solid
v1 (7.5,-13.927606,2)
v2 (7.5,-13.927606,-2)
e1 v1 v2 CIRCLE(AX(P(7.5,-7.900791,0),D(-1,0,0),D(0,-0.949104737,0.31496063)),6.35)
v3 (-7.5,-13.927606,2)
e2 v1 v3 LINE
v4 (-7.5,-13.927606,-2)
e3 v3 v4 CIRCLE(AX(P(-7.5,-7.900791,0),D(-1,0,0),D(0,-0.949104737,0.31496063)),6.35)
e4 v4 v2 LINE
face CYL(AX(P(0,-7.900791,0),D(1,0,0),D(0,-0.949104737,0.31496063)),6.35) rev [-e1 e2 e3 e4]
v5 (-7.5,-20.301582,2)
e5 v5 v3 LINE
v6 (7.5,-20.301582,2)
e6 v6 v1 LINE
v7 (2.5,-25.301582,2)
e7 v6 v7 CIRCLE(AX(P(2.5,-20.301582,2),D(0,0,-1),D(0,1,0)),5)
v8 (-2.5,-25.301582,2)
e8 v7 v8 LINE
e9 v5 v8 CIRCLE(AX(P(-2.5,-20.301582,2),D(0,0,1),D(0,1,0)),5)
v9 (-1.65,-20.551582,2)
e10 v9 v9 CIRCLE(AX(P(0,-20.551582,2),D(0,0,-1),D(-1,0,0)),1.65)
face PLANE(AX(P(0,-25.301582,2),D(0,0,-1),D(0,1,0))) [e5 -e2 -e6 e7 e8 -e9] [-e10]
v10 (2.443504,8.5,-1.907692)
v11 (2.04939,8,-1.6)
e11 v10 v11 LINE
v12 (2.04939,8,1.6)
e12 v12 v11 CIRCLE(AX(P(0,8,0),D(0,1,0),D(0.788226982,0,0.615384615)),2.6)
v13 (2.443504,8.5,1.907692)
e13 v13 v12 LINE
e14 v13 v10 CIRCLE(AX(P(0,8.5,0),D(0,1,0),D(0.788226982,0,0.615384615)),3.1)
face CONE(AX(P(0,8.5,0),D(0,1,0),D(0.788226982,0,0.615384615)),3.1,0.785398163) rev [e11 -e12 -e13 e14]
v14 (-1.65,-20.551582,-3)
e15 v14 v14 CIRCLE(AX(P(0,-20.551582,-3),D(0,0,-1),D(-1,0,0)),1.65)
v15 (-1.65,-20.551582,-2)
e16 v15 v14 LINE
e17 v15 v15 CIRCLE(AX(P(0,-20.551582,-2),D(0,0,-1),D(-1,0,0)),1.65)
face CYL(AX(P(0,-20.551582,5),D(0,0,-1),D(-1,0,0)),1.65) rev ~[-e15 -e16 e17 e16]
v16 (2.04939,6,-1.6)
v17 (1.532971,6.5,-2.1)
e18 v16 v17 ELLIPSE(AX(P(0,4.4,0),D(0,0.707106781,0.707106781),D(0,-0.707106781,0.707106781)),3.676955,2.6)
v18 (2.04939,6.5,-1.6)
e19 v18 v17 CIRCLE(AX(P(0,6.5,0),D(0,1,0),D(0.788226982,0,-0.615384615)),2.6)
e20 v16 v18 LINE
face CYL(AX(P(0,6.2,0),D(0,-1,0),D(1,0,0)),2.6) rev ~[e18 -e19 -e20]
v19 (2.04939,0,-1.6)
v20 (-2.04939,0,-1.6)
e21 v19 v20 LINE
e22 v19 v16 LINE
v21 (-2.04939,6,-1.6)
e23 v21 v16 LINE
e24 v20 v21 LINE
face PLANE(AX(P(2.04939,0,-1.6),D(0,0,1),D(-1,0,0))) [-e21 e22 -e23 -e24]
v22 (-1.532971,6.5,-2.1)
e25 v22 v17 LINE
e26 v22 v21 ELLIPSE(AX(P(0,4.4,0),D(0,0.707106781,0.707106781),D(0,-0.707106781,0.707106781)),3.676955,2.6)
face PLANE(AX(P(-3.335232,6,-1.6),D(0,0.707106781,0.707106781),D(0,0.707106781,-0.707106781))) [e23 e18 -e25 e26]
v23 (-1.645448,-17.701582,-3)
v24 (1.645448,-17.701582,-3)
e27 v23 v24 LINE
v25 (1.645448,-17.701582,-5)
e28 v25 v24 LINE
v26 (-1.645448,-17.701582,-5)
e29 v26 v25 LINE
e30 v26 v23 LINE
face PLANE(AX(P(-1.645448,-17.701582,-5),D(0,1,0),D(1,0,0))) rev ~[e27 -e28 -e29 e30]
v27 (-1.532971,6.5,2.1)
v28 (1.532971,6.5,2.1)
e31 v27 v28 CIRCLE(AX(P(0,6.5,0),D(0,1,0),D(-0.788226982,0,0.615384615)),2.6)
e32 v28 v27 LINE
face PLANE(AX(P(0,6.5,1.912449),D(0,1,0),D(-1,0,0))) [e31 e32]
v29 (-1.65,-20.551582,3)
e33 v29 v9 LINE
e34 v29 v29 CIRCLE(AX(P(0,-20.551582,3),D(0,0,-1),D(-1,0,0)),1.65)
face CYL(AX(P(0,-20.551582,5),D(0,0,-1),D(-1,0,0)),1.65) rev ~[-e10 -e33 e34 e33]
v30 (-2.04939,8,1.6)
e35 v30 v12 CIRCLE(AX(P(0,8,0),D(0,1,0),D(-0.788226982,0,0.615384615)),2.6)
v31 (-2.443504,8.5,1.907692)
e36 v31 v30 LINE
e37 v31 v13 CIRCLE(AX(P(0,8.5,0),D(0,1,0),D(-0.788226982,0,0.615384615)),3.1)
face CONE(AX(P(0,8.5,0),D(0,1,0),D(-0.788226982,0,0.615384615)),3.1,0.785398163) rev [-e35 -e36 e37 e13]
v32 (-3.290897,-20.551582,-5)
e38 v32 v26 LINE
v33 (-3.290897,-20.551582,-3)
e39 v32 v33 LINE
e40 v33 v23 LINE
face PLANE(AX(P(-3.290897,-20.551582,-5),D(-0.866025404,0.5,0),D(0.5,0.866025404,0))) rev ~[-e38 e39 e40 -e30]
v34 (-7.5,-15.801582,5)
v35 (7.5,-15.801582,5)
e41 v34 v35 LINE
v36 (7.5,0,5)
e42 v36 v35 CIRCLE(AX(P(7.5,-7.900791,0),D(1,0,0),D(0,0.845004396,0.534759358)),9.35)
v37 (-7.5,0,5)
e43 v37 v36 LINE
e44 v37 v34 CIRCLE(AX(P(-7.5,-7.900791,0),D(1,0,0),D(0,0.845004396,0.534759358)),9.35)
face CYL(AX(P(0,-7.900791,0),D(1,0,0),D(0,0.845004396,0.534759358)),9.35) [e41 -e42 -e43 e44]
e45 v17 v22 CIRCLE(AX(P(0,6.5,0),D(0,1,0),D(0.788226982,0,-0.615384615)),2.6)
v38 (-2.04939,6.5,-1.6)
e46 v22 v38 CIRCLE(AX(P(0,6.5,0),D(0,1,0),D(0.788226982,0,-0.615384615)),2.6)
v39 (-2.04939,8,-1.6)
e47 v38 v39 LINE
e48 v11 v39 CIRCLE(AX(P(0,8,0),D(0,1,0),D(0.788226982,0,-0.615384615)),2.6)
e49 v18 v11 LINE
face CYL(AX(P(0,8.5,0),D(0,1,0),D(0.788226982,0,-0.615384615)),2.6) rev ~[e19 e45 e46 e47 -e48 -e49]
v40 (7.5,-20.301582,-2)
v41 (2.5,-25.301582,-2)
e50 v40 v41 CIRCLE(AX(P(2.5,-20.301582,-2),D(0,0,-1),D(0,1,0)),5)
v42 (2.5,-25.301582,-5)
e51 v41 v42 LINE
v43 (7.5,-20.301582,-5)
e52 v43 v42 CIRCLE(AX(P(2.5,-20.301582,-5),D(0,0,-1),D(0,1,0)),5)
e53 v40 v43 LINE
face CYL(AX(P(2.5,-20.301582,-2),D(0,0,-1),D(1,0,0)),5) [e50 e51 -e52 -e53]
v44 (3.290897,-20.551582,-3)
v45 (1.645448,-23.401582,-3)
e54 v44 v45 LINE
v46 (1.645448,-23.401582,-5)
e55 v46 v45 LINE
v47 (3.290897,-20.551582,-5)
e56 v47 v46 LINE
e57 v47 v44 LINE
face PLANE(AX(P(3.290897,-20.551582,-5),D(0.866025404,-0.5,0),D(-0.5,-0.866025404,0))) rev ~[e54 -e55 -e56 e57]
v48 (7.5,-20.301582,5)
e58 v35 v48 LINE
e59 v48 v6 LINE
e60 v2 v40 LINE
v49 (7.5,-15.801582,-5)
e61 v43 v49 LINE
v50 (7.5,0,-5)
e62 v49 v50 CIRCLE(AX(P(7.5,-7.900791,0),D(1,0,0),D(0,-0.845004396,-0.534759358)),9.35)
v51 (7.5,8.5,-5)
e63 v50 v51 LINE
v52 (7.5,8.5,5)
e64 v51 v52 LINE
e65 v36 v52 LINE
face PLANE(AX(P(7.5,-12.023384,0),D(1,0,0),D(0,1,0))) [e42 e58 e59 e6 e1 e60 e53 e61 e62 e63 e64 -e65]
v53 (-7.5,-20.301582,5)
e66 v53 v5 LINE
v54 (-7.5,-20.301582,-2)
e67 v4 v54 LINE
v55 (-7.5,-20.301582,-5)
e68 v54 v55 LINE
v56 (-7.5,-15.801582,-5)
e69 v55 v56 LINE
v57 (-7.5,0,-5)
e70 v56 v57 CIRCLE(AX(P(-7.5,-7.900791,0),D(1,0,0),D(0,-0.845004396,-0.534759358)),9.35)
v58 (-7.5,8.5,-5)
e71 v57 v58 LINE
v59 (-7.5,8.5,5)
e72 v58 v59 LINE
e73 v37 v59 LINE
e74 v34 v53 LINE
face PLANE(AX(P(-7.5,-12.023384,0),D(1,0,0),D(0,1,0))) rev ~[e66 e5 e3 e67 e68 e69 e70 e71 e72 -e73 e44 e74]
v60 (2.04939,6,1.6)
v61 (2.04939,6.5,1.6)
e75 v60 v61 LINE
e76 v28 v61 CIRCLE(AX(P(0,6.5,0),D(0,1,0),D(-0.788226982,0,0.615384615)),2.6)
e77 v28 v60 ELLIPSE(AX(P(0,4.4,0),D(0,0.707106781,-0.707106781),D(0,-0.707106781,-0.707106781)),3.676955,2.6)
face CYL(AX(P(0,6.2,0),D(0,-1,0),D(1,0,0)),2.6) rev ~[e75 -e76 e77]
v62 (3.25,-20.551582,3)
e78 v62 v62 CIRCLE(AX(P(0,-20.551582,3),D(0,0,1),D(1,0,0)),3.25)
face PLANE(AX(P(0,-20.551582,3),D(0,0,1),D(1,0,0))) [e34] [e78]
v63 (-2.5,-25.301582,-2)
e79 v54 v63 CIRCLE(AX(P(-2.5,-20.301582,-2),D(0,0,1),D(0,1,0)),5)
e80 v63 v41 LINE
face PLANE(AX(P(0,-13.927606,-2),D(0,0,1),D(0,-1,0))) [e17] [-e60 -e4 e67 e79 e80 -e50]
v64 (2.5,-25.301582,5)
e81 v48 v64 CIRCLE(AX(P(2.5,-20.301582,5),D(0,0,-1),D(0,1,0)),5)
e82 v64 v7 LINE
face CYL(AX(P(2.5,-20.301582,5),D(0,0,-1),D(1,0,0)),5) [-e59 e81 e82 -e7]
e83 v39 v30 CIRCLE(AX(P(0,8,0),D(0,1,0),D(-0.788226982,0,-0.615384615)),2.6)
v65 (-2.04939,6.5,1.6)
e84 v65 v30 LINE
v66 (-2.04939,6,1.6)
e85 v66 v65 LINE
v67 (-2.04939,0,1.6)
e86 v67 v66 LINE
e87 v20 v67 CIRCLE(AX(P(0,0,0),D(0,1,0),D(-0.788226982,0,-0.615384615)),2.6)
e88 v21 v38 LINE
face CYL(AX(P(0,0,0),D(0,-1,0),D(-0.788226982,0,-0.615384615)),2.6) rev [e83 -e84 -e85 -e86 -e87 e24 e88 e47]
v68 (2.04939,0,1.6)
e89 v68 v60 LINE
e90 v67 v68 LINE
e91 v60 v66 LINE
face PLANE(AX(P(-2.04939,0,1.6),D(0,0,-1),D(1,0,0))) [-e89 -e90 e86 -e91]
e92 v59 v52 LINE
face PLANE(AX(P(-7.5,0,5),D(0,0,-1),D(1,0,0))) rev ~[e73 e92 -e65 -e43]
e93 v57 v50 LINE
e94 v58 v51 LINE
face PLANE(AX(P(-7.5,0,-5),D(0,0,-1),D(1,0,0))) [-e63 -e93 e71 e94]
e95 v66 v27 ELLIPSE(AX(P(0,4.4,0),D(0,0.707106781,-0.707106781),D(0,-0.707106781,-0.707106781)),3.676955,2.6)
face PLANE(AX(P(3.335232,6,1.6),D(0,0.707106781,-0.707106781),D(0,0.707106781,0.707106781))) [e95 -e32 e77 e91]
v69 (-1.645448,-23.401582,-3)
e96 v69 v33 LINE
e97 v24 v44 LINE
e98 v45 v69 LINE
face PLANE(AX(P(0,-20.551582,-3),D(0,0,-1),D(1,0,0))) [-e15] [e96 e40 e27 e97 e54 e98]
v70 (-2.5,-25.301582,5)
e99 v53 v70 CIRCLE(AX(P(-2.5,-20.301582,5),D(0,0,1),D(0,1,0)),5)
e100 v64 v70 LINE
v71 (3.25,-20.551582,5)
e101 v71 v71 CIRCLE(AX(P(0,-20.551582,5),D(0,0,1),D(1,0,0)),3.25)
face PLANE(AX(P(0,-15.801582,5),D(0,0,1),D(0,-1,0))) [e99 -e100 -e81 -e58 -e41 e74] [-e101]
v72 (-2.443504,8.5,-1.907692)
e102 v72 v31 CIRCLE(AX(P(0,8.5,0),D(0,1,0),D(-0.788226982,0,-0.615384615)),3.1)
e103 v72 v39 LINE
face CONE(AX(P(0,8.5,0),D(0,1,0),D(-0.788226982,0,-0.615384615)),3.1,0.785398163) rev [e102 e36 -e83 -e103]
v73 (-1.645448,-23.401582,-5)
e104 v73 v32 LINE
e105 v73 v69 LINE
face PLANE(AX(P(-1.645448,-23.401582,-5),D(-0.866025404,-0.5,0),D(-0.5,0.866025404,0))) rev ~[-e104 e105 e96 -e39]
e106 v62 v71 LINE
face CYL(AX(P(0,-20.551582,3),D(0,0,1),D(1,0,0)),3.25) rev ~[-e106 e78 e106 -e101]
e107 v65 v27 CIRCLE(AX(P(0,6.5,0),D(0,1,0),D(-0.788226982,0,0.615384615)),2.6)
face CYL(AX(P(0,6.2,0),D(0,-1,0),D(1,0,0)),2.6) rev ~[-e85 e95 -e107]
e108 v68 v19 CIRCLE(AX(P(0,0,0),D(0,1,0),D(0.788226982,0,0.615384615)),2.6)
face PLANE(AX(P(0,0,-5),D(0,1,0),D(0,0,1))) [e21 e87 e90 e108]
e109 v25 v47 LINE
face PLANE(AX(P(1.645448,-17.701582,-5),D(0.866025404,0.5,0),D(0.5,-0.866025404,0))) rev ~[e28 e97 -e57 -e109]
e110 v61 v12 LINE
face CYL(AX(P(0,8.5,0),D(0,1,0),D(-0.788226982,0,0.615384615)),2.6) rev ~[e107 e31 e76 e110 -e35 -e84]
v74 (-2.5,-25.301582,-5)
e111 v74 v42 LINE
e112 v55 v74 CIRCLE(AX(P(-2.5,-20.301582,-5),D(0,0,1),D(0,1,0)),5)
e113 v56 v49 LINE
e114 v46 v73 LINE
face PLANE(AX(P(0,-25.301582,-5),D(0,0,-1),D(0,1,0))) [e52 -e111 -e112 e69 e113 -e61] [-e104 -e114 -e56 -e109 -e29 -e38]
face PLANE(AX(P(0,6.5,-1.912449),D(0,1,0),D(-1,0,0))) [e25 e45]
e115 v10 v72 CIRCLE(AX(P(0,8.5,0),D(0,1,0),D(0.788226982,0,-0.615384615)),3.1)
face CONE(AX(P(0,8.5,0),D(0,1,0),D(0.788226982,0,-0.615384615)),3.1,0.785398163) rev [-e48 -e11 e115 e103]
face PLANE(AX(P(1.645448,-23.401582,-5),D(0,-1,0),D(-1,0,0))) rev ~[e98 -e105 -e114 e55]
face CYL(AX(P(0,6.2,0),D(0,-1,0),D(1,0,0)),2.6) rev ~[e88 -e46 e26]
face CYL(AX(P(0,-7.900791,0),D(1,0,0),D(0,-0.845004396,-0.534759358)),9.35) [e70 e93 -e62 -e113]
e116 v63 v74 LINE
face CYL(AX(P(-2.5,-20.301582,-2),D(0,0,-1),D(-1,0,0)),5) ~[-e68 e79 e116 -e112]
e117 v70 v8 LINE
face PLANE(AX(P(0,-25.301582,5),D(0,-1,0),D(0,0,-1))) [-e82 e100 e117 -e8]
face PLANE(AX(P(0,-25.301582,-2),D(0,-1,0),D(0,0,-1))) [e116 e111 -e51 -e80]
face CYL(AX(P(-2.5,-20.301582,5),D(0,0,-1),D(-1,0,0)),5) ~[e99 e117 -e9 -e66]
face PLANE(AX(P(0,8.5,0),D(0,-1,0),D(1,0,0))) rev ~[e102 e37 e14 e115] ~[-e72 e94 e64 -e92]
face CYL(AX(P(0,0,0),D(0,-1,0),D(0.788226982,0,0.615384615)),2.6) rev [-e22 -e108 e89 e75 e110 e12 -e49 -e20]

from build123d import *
from build123d import SkipClean  # not in build123d's __all__

# Parameters (mm, degrees)
F0_W           = 15
F0_H           = 10
F1_DEPTH       = 8.5
F3_DEPTH       = 7.5
F5_D           = 3.3
F5_CBORE_D     = 6.5
F5_CBORE_DEPTH = 2
F7_DEPTH       = 2
F8_R           = 5
F10_DEPTH      = 2
F11_T3_DEPTH   = 6.6704632943
F11_S4_R       = 2.6
F11_T5_DEPTH   = 5
F11_T8_DEPTH   = 6.6704632943
F11_S9_R       = 2.6
F11_T10_DEPTH  = 5
F11_T13_ANGLE  = 75.9597448897
F11_T16_ANGLE  = 75.9597448897
F11_T19_ANGLE  = 104.0402551103
F11_T22_ANGLE  = 104.0402551103


# Not quite as in the source:
# - a fillet or chamfer that OpenCascade refuses, or shapes differently, is made with other operations: its cross-section is extruded or revolved along the edge and cut away or added


with BuildPart() as f1:
    # F0 (on Front) → F1 (new body)
    with BuildSketch(Plane.XZ):
        Rectangle(F0_W, F0_H)
        with BuildLine():
            ThreePointArc((-2.0493901532, -1.6), (-2.6, 0), (-2.0493901532, 1.6))
            Line((-2.0493901532, 1.6), (2.0493901532, 1.6))
            ThreePointArc((2.0493901532, 1.6), (2.6, 0), (2.0493901532, -1.6))
            Line((2.0493901532, -1.6), (-2.0493901532, -1.6))
        make_face(mode=Mode.SUBTRACT)
    extrude(amount=-F1_DEPTH)

    # F2 (on Right) → F3 (join, symmetric)
    with BuildSketch(Plane.YZ):
        with BuildLine():
            ThreePointArc((-13.9276061789, 2), (-1.5507910996, 0), (-13.9276061789, -2))
            Line((-13.9276061789, -2), (-25.3015821993, -2))
            Line((-25.3015821993, -2), (-25.3015821993, -5))
            Line((-25.3015821993, -5), (-15.8015821993, -5))
            ThreePointArc((-15.8015821993, -5), (-7.9007910996, -9.35), (0, -5))
            Line((0, -5), (0, 5))
            ThreePointArc((0, 5), (-7.9007910996, 9.35), (-15.8015821993, 5))
            Line((-15.8015821993, 5), (-25.3015821993, 5))
            Line((-25.3015821993, 5), (-25.3015821993, 2))
            Line((-25.3015821993, 2), (-13.9276061789, 2))
        make_face()
    extrude(amount=F3_DEPTH, both=True)

    # F5 (through all)
    with Locations(Plane.XY.offset(5)):
        with Locations((0, -20.5515821993)):
            CounterBoreHole(F5_D / 2, F5_CBORE_D / 2, F5_CBORE_DEPTH)

    # F6 (on face) → F7 (cut)
    with BuildSketch(Plane(origin=(0, 0, -5), x_dir=(1, 0, 0), z_dir=(0, 0, -1))):
        Polygon((-1.6454482672, 17.7015821993), (1.6454482672, 17.7015821993), (3.2908965344, 20.5515821993), (1.6454482672, 23.4015821993), (-1.6454482672, 23.4015821993), (-3.2908965344, 20.5515821993), align=None)
    extrude(amount=-F7_DEPTH, mode=Mode.SUBTRACT)

    # F8
    f8_edges = [f1.edges().sort_by_distance(p)[0] for p in [
        (7.5, -25.301582, 3.5),
        (-7.5, -25.301582, 3.5),
        (-7.5, -25.301582, -3.5),
        (7.5, -25.301582, -3.5),
    ]]
    fillet(f8_edges, radius=F8_R)

    # F9 (on face) → F10 (cut)
    with BuildSketch(Plane(origin=(0, 8.5, 0), x_dir=(-1, 0, 0), z_dir=(0, 1, 0))):
        with BuildLine():
            Line((-2.0493901532, 1.6), (2.0493901532, 1.6))
            ThreePointArc((2.0493901532, 1.6), (0, 2.6), (-2.0493901532, 1.6))
        make_face()
        with BuildLine():
            ThreePointArc((-2.0493901532, -1.6), (0, -2.6), (2.0493901532, -1.6))
            Line((2.0493901532, -1.6), (-2.0493901532, -1.6))
        make_face()
    with SkipClean():  # cleaning this boolean's faces spoils the solid; the shape is the same uncleaned
        extrude(amount=-F10_DEPTH, mode=Mode.SUBTRACT)

    # F11: chamfer of 0.5 on 6 edges, made by hand


with BuildPart() as f11_tool1:
    # F11_s2 → F11_t3 (new body)
    with BuildSketch(Plane.YZ.offset(3.3352316472)):
        Polygon((6, 1.6), (6.5, 2.1), (6.5, 1.6), align=None)
    extrude(amount=-F11_T3_DEPTH)

    # F11_s4 → F11_t5 (intersect, symmetric)
    with BuildSketch(Plane.XZ.offset(-6.2)):
        Circle(F11_S4_R)
    extrude(amount=F11_T5_DEPTH, both=True, mode=Mode.INTERSECT)


with BuildPart() as f11_tool6:
    # F11_s7 → F11_t8 (new body)
    with BuildSketch(Plane.YZ.offset(-3.3352316472)):
        Polygon((6, -1.6), (6.5, -2.1), (6.5, -1.6), align=None)
    extrude(amount=F11_T8_DEPTH)

    # F11_s9 → F11_t10 (intersect, symmetric)
    with BuildSketch(Plane.XZ.offset(-6.2)):
        Circle(F11_S9_R)
    extrude(amount=F11_T10_DEPTH, both=True, mode=Mode.INTERSECT)


with BuildPart() as f11_tool11:
    # F11_s12 → F11_t13 (revolve)
    with BuildSketch(Plane(origin=(0, 0, 0), x_dir=(0, 1, 0), z_dir=(0.6153846154, 0, -0.788226982))):
        Polygon((8.5, -3.1), (8, -2.6), (8.5, -2.6), align=None)
    revolve(axis=Axis((0, 8.5, 0), (0, 1, 0)), revolution_arc=F11_T13_ANGLE)


with BuildPart() as f11_tool14:
    # F11_s15 → F11_t16 (revolve)
    with BuildSketch(Plane(origin=(0, 0, 0), x_dir=(0, 1, 0), z_dir=(-0.6153846154, 0, 0.788226982))):
        Polygon((8.5, -3.1), (8, -2.6), (8.5, -2.6), align=None)
    revolve(axis=Axis((0, 8.5, 0), (0, 1, 0)), revolution_arc=F11_T16_ANGLE)


with BuildPart() as f11_tool17:
    # F11_s18 → F11_t19 (revolve)
    with BuildSketch(Plane(origin=(0, 0, 0), x_dir=(0, 1, 0), z_dir=(-0.6153846154, 0, -0.788226982))):
        Polygon((8.5, -3.1), (8, -2.6), (8.5, -2.6), align=None)
    revolve(axis=Axis((0, 8.5, 0), (0, 1, 0)), revolution_arc=F11_T19_ANGLE)


with BuildPart() as f11_tool20:
    # F11_s21 → F11_t22 (revolve)
    with BuildSketch(Plane(origin=(0, 0, 0), x_dir=(0, 1, 0), z_dir=(0.6153846154, 0, 0.788226982))):
        Polygon((8.5, -3.1), (8, -2.6), (8.5, -2.6), align=None)
    revolve(axis=Axis((0, 8.5, 0), (0, 1, 0)), revolution_arc=F11_T22_ANGLE)


with BuildPart() as f1_1:
    add(f1.part, clean=False)

    # F11_t23: cut F11_tool1, F11_tool6, F11_tool11, F11_tool14, F11_tool17, F11_tool20
    add([f11_tool1.part, f11_tool6.part, f11_tool11.part, f11_tool14.part, f11_tool17.part, f11_tool20.part], mode=Mode.SUBTRACT)


solid = f1_1.part
